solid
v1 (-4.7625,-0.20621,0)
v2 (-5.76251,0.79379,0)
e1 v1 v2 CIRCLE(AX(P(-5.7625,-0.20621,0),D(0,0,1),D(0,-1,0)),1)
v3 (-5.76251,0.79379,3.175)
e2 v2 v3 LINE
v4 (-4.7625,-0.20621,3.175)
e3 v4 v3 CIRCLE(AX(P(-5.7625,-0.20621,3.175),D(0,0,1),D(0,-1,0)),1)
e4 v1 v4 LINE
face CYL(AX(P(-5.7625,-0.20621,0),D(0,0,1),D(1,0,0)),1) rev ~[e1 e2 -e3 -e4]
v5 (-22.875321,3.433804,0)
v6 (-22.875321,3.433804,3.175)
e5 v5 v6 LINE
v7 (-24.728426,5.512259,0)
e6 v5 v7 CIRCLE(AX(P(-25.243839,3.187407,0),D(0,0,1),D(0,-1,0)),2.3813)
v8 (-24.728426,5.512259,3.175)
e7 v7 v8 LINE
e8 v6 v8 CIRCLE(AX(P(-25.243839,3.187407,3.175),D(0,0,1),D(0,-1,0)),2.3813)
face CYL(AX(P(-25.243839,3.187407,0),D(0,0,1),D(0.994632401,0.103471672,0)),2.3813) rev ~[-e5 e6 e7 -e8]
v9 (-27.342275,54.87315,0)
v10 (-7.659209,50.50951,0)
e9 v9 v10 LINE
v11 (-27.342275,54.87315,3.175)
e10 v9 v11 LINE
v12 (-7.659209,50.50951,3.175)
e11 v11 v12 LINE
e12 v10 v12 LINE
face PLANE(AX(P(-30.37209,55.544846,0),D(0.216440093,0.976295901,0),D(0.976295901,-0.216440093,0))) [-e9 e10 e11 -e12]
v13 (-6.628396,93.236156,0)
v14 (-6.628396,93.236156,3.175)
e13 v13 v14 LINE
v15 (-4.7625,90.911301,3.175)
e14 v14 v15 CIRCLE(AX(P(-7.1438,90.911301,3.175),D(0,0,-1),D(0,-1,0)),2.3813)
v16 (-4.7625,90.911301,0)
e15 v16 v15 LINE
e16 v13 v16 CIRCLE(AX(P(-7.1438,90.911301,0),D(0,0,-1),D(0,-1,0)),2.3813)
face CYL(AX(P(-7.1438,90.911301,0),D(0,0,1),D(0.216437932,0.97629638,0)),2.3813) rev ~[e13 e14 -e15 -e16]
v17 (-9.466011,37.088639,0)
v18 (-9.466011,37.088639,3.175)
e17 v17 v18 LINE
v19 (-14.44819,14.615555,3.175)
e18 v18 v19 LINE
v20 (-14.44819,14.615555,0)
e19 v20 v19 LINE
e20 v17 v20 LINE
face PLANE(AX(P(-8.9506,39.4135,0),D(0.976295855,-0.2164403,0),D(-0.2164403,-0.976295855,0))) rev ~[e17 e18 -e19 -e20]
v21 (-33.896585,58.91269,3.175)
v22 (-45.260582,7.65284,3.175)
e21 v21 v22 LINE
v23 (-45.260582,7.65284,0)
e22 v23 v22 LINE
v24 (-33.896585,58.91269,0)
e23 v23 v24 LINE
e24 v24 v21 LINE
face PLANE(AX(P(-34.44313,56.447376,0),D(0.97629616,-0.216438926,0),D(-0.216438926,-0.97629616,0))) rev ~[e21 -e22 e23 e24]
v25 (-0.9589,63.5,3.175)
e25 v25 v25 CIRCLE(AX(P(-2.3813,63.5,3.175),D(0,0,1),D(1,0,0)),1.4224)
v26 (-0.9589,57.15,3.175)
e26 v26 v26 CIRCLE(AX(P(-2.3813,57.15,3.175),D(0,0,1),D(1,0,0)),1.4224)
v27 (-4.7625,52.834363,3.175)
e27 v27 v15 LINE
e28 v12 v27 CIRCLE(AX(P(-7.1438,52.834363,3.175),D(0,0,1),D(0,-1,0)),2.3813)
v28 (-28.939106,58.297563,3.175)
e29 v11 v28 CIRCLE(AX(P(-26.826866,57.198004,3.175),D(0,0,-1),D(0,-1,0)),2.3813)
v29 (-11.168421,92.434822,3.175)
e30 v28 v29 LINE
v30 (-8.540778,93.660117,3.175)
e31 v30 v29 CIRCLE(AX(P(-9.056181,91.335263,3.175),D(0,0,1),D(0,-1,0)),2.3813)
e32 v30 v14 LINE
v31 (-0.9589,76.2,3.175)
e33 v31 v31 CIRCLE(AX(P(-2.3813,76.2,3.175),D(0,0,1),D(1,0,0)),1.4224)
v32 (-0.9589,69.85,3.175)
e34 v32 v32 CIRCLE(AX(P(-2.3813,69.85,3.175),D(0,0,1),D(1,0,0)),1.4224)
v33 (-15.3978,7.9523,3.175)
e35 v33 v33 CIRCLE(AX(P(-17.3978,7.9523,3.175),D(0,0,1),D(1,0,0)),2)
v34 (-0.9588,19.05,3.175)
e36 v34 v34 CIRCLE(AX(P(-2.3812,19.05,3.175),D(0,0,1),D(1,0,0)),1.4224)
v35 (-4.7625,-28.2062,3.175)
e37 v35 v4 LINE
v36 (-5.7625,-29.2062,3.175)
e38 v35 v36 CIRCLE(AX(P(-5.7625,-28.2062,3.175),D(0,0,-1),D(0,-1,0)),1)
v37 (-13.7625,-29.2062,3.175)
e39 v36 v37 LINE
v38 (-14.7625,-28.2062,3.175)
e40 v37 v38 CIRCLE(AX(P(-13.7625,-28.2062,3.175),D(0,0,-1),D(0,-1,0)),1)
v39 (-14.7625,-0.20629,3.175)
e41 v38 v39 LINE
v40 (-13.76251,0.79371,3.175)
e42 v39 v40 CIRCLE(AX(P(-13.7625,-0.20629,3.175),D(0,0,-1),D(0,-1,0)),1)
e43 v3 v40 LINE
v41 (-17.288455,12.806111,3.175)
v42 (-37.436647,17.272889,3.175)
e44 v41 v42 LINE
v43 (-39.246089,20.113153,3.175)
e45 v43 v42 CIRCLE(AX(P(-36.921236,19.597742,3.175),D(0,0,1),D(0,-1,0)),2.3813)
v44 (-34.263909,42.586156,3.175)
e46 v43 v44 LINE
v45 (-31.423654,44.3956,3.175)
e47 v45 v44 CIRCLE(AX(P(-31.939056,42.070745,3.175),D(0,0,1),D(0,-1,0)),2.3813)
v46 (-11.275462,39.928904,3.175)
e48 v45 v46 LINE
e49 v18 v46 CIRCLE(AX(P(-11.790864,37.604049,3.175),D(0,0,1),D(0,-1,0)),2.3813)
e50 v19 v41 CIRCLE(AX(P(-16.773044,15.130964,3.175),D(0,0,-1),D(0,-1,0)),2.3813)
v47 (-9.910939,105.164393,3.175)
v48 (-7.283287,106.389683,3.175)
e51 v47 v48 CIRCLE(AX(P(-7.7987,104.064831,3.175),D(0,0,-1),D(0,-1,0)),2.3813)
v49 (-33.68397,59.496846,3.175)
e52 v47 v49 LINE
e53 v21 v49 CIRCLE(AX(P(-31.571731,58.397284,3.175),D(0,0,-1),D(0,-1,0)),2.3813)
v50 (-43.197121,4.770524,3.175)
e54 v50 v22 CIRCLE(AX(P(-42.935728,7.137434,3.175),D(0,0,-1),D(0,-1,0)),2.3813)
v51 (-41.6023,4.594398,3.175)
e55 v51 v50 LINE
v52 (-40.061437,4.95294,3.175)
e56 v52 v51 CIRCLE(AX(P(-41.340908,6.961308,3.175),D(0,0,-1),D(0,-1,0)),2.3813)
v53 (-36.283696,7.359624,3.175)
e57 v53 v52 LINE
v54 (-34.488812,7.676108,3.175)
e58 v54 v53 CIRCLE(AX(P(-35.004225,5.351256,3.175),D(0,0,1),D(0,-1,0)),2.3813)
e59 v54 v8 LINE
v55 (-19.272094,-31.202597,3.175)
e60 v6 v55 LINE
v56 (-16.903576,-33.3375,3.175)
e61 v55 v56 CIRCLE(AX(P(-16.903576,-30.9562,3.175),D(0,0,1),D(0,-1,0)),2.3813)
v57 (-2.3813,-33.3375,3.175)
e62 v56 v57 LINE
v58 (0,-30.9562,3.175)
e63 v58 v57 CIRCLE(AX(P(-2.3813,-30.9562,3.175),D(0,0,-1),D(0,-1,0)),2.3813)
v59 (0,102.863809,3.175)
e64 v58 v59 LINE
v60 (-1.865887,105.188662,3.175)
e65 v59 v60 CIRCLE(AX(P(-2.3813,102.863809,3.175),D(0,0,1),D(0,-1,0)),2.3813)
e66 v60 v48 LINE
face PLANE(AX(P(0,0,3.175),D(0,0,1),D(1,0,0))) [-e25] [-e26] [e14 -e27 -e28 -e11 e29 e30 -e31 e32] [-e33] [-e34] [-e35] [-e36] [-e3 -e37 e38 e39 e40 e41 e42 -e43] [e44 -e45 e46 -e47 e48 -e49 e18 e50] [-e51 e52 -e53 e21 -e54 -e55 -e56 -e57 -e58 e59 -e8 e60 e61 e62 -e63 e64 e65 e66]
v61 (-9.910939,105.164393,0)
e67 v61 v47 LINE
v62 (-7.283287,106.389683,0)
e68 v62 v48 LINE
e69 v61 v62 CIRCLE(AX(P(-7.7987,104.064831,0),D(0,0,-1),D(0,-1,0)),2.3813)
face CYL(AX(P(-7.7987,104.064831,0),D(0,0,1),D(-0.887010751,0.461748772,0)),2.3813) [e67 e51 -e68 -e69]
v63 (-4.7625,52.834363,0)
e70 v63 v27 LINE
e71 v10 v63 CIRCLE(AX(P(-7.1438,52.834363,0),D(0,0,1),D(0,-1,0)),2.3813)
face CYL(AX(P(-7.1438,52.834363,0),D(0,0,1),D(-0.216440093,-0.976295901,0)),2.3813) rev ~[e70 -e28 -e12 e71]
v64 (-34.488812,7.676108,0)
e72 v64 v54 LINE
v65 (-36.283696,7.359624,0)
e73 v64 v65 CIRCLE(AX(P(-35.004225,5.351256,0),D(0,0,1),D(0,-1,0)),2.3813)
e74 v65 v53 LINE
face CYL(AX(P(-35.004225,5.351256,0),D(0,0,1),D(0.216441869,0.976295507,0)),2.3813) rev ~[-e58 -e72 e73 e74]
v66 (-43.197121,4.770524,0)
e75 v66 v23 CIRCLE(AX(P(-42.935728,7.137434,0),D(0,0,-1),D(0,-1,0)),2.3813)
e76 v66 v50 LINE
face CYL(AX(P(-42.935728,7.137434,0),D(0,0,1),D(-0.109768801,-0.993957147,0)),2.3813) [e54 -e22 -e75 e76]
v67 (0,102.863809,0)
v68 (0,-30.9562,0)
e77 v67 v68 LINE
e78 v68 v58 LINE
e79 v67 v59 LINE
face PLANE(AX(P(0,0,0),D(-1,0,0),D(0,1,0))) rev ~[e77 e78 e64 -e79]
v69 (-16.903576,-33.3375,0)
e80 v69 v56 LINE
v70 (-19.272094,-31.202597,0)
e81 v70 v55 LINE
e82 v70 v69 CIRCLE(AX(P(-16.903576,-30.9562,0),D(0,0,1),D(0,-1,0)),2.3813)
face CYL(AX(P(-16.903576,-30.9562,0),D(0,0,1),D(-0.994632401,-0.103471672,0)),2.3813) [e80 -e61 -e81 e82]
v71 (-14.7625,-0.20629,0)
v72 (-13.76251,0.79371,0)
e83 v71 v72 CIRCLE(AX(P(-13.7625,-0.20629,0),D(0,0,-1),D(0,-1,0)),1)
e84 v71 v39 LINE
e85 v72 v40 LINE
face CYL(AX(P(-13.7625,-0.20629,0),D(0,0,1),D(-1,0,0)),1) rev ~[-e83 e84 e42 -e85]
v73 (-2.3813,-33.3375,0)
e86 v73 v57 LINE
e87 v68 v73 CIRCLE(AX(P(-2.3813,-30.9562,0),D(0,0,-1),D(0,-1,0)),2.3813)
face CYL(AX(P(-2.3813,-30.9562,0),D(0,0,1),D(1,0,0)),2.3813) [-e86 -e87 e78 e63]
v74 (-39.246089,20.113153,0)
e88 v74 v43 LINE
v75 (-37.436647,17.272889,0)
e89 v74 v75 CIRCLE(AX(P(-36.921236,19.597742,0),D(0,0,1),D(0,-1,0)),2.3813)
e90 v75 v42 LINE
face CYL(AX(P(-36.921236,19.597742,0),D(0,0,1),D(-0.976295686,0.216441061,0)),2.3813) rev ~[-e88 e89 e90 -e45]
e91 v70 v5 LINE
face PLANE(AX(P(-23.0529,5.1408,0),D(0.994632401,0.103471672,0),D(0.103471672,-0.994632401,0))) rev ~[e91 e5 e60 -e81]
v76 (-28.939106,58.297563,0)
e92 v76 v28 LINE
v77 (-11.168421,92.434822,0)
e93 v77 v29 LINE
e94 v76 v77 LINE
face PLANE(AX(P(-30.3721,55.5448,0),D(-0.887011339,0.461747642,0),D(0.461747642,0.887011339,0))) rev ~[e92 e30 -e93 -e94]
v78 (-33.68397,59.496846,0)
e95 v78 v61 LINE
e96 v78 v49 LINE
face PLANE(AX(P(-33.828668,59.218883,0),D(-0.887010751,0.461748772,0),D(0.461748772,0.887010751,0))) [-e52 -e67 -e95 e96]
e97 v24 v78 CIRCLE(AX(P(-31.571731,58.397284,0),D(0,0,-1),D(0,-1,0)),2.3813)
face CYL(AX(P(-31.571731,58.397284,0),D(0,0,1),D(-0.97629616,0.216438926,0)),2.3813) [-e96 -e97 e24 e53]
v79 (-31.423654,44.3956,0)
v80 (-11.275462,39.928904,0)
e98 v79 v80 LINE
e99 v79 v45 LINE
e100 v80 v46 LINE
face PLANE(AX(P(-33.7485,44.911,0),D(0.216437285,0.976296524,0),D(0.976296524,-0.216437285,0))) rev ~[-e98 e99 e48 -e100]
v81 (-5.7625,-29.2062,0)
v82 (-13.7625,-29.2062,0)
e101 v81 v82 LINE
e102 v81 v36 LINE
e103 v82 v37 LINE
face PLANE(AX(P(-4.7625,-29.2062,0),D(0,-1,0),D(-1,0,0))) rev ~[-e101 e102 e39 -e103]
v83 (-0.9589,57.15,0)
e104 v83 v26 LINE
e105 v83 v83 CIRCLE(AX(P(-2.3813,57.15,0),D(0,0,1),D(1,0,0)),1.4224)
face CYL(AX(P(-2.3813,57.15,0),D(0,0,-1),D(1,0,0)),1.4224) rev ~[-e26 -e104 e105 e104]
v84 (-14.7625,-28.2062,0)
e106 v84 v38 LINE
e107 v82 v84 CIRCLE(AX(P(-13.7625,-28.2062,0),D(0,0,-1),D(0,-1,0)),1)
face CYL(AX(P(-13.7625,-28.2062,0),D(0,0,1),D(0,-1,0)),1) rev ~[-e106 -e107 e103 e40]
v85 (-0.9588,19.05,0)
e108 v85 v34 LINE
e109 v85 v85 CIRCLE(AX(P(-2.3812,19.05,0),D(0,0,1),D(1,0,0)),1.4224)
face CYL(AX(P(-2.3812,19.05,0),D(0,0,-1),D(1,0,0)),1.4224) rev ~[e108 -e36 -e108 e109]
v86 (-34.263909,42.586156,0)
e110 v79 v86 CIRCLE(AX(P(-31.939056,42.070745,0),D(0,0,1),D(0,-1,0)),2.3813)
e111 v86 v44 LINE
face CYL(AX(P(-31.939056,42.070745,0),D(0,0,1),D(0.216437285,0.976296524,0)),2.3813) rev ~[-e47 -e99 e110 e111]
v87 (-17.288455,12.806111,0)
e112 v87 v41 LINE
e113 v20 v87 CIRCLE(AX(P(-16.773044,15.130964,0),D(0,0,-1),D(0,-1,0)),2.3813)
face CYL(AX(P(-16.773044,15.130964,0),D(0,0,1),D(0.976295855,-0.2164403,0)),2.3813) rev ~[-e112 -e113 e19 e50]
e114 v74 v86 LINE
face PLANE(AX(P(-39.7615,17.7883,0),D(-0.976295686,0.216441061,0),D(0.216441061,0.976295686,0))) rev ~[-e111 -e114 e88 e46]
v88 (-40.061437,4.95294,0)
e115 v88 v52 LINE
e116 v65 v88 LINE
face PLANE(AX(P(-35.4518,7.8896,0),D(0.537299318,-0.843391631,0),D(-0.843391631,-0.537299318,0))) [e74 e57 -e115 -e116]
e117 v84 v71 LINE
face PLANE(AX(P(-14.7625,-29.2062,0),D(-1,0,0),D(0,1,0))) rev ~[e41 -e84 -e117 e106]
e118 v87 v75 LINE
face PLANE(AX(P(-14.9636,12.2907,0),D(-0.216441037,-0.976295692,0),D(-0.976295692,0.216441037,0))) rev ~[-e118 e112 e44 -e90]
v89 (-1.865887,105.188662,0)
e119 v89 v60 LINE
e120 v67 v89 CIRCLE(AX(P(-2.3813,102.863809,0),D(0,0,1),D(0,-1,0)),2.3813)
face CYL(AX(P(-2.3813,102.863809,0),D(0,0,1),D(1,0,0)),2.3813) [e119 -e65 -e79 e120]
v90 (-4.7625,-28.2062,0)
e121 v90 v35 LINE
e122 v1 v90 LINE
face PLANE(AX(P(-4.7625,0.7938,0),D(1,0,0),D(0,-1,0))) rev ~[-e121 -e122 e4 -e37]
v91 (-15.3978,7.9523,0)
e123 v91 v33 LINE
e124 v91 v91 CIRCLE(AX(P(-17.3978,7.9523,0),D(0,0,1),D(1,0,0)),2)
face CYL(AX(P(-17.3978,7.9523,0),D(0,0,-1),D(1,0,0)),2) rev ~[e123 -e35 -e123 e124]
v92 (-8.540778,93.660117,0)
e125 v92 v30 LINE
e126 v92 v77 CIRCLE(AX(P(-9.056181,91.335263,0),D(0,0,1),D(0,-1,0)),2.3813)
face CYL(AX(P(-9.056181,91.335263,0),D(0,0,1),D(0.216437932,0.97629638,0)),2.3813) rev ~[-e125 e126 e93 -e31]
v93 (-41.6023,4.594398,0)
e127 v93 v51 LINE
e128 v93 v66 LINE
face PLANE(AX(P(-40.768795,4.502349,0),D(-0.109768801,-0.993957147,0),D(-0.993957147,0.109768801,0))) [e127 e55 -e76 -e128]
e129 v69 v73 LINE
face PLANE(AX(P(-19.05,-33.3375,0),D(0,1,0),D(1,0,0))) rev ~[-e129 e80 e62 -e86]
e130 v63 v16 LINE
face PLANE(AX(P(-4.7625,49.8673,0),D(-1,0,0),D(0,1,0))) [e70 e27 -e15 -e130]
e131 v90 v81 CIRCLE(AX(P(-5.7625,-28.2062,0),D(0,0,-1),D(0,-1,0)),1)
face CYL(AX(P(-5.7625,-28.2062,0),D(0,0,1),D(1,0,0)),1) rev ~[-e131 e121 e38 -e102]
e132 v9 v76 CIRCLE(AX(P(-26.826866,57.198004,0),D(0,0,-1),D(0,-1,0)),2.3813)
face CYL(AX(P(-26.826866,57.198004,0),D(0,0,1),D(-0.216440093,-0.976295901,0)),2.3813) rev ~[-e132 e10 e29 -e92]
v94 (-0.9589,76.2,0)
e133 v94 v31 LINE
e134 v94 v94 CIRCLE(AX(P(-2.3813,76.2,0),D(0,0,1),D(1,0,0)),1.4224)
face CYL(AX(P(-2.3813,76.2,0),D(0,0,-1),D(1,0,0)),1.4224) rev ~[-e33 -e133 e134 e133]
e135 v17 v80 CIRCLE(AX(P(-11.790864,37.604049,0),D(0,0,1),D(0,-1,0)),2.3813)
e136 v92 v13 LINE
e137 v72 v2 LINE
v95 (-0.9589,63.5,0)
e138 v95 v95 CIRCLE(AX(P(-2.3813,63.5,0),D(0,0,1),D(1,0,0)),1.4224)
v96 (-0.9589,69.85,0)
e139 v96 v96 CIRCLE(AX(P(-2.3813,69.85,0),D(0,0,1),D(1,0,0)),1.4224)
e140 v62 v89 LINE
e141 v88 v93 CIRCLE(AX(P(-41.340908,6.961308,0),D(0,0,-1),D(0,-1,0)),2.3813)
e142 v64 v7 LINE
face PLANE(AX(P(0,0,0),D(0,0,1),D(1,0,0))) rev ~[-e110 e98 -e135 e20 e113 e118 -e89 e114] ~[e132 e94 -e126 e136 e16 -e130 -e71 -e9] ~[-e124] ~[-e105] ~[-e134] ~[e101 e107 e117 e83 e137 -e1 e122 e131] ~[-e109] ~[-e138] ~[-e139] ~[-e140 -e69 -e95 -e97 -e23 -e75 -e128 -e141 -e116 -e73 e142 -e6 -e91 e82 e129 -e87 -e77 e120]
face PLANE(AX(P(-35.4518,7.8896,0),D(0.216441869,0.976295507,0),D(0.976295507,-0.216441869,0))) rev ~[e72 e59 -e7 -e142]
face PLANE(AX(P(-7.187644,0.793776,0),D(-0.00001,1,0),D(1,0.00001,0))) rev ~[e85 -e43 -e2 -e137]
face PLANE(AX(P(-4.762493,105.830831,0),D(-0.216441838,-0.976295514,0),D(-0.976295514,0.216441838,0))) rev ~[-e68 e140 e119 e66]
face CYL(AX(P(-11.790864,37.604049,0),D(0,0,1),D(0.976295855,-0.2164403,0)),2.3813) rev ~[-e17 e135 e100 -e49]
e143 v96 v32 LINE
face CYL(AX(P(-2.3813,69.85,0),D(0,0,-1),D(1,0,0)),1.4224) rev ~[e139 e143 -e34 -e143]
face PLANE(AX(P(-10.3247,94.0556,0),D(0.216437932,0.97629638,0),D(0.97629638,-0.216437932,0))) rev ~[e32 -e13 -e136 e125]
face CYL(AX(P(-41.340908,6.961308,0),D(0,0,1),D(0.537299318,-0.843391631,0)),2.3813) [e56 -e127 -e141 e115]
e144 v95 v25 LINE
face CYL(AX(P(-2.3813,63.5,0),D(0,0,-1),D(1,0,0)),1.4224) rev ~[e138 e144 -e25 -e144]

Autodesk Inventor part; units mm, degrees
ref_plane "YZ Plane" through (0, 0, 0) normal (1, 0, 0) x (0, 1, 0)
ref_plane "XZ Plane" through (0, 0, 0) normal (0, 1, 0) x (-1, 0, 0)
ref_plane "XY Plane" through (0, 0, 0) normal (0, 0, 1) x (1, 0, 0)
sketch "Sketch1" plane through (0, 0, 0) normal (0, 0, 1) x (1, 0, 0)
  line L0 (0, 0) -> (0, 136.2362)
  line L1 (-14.9636, 12.2907) -> (-39.7615, 17.7883)
  line L2 (-39.7615, 17.7883) -> (-33.7485, 44.911)
  line L3 (-33.7485, 44.911) -> (-8.9506, 39.4135)
  line L4 (-8.9506, 39.4135) -> (-14.9636, 12.2907)
  line L5 (-39.7615, 17.7883) -> (-8.9506, 39.4135) construction
  line L6 (-33.7485, 44.911) -> (-14.9636, 12.2907) construction
  circle A0 centre (-57.15, 12.7) radius 3.3401
  circle A1 centre (-57.15, 12.7) radius 6.35
  line L7 (0, 0) -> (-57.847, 6.3884)
  line L8 (-62.7825, 15.6321) -> (0, 136.2362)
  line L9 (-21.3496, 42.1622) -> (-27.3626, 15.0395) construction
  line L10 (0, 104.775) -> (-14.6831, 108.0302)
  line L11 (-35.4518, 7.8896) -> (-23.0529, 5.1408)
  line L12 (-23.0529, 5.1408) -> (-24.4273, -1.0586) construction
  line L13 (-24.4273, -1.0586) -> (-36.8262, 1.6901) construction
  line L14 (-36.8262, 1.6901) -> (-35.4518, 7.8896) construction
  line L15 (-35.4518, 7.8896) -> (-40.7688, 4.5023)
  line L16 (-8.9506, 39.4135) -> (-33.7485, 44.911)
  line L17 (-56.4271, 15.9609) -> (-57.15, 12.7) construction
  line L18 (-57.15, 12.7) -> (-60.4109, 13.4229) construction
  line L19 (-29.2523, 6.5152) -> (-36.1243, -24.4822) construction
  line L20 (-56.356, 15.9443) -> (-9.0672, 106.7852)
  line L21 (-35.1857, 56.612) -> (0, 48.8115)
  line L22 (-4.7625, 49.8673) -> (-4.7625, 105.8308)
  line L23 (-30.3721, 55.5448) -> (-10.3247, 94.0556)
  line L24 (-10.3247, 94.0556) -> (-4.7625, 92.8225)
  circle A2 centre (-17.3978, 7.9523) radius 2
  line L25 (0, 13.4938) -> (-4.7625, 13.4937) construction
  line L26 (-4.7625, 13.4937) -> (-4.7625, 24.6063) construction
  line L27 (-4.7625, 24.6063) -> (0, 24.6063) construction
  line L28 (0, 24.6063) -> (0, 13.4938) construction
  line L29 (-4.7625, 19.05) -> (0, 19.05) construction
  circle A3 centre (-2.3812, 19.05) radius 1.4224
  line L30 (-4.7625, 57.15) -> (0, 57.15) construction
  circle A4 centre (-2.3813, 57.15) radius 1.4224
  circle A5 centre (-2.3813, 63.5) radius 1.4224
  circle A6 centre (-2.3813, 69.85) radius 1.4224
  circle A7 centre (-2.3813, 76.2) radius 1.4224
  line L31 (-22.792, 92.4532) -> (-17.8635, 89.8876)
  circle A8 centre (-57.15, 12.7) radius 9.525 construction
  line L32 (-14.7625, 0.7937) -> (-4.7625, 0.7938)
  line L33 (-4.7625, 0.7938) -> (-4.7625, -29.2062)
  line L34 (-4.7625, -29.2062) -> (-14.7625, -29.2062)
  line L35 (-14.7625, -29.2062) -> (-14.7625, 0.7937)
  line L36 (-14.7625, 0.7937) -> (-4.7625, -29.2062) construction
  line L37 (-4.7625, 0.7938) -> (-14.7625, -29.2062) construction
  line L38 (-19.05, -33.3375) -> (0, -33.3375)
  line L39 (0, -33.3375) -> (0, 0)
  line L40 (-23.0529, 5.1408) -> (-19.05, -33.3375)
  circle A9 centre (-17.3978, 7.9523) radius 6.5 construction
  line L41 (-22.7129, 14.0087) -> (-24.6027, 5.4844) construction
  line L42 (-17.3978, 7.9523) -> (-23.8273, 9.3776) construction
  line L43 (-33.8287, 59.2189) -> (-45.835, 5.0618)
  point P0 (-24.3561, 28.6009)
  point P1 (-23.6144, 2.6079)
  point P2 (-36.3119, 4.0101)
  point P3 (-54.945, 18.6549)
  point P4 (0, 48.8115)
  point P5 (-24.3561, 28.6009)
  point P6 (-9.7625, -14.2062)
  dimension "d14" = 27.7812
  dimension "d15" = 25.4
  dimension "d16" = 12.5
  dimension "d17" = 6.6802
  dimension "d19" = 57.15
  dimension "d22" = 12.7
  dimension "d26" = 102.5
  dimension "d29" = 6.35
  dimension "d31" = 6.35
  dimension "d35" = 28.575
  dimension "d38" = 31.75
  dimension "d55" = 4.7625
  dimension "d56" = 4.7625
  dimension "d60" = 12.7
  dimension "d66" = 4
  dimension "d72" = 8.7312
  dimension "d80" = 104.775
  dimension "d85" = 4.7625
  dimension "d86" = 11.1125
  dimension "d87" = 2.8448
  dimension "d88" = 19.05
  dimension "d89" = 2.8448
  dimension "d90" = 38.1
  dimension "d93" = 6.35
  dimension "d104" = 27.5
  dimension "d105" = 5.5563
  dimension "d106" = 19.05
  dimension "d111" = 19.05
  dimension "d112" = 10
  dimension "d113" = 30
  dimension "d114" = 4.7625
  dimension "d115" = 0.7937
  dimension "d117" = 19.05
  dimension "d119" = 11.1125
  dimension "d120" = 12.7
  dimension "d121" = 33.3375
  dimension "d122" = 45
  dimension "d123" = 13
  dimension "d124" = 4.7625
  dimension "d125" = 4.7625
  dimension "d126" = 3.175
extrude "Extrusion1" add sketch "Sketch1" along normal blind 3.175 contours L7 L33 L32 L40 L11 L15 L43 L21 L0 | L39 L38 L40 L7 L32 L35 L34 L33 | L21 L22 L10 L0 | L22 L24 L23 L21 L43 L20 L10
fillet "Fillet1" radius 2.3813 17 edges at (-39.7615, 17.7883, 1.5875) (-14.9636, 12.2907, 1.5875) (-23.0529, 5.1408, 1.5875) (-35.4518, 7.8896, 1.5875) (-40.7688, 4.5023, 1.5875) (-4.7625, 92.8225, 1.5875) (-30.3721, 55.5448, 1.5875) (-4.7625, 49.8673, 1.5875) (-33.7485, 44.911, 1.5875) (-8.9506, 39.4135, 1.5875) (-19.05, -33.3375, 1.5875) (0, -33.3375, 1.5875) (-10.3247, 94.0556, 1.5875) (-33.8287, 59.2189, 1.5875) (-45.835, 5.0618, 1.5875) (-9.0672, 106.7852, 1.5875) (0, 104.775, 1.5875)
fillet "Fillet6" radius 1 4 edges at (-4.7625, 0.7938, 1.5875) (-14.7625, 0.7937, 1.5875) (-14.7625, -29.2062, 1.5875) (-4.7625, -29.2062, 1.5875)
equation "\"d56\" = d55"
properties part number "Uprights" material "Stainless Steel"
